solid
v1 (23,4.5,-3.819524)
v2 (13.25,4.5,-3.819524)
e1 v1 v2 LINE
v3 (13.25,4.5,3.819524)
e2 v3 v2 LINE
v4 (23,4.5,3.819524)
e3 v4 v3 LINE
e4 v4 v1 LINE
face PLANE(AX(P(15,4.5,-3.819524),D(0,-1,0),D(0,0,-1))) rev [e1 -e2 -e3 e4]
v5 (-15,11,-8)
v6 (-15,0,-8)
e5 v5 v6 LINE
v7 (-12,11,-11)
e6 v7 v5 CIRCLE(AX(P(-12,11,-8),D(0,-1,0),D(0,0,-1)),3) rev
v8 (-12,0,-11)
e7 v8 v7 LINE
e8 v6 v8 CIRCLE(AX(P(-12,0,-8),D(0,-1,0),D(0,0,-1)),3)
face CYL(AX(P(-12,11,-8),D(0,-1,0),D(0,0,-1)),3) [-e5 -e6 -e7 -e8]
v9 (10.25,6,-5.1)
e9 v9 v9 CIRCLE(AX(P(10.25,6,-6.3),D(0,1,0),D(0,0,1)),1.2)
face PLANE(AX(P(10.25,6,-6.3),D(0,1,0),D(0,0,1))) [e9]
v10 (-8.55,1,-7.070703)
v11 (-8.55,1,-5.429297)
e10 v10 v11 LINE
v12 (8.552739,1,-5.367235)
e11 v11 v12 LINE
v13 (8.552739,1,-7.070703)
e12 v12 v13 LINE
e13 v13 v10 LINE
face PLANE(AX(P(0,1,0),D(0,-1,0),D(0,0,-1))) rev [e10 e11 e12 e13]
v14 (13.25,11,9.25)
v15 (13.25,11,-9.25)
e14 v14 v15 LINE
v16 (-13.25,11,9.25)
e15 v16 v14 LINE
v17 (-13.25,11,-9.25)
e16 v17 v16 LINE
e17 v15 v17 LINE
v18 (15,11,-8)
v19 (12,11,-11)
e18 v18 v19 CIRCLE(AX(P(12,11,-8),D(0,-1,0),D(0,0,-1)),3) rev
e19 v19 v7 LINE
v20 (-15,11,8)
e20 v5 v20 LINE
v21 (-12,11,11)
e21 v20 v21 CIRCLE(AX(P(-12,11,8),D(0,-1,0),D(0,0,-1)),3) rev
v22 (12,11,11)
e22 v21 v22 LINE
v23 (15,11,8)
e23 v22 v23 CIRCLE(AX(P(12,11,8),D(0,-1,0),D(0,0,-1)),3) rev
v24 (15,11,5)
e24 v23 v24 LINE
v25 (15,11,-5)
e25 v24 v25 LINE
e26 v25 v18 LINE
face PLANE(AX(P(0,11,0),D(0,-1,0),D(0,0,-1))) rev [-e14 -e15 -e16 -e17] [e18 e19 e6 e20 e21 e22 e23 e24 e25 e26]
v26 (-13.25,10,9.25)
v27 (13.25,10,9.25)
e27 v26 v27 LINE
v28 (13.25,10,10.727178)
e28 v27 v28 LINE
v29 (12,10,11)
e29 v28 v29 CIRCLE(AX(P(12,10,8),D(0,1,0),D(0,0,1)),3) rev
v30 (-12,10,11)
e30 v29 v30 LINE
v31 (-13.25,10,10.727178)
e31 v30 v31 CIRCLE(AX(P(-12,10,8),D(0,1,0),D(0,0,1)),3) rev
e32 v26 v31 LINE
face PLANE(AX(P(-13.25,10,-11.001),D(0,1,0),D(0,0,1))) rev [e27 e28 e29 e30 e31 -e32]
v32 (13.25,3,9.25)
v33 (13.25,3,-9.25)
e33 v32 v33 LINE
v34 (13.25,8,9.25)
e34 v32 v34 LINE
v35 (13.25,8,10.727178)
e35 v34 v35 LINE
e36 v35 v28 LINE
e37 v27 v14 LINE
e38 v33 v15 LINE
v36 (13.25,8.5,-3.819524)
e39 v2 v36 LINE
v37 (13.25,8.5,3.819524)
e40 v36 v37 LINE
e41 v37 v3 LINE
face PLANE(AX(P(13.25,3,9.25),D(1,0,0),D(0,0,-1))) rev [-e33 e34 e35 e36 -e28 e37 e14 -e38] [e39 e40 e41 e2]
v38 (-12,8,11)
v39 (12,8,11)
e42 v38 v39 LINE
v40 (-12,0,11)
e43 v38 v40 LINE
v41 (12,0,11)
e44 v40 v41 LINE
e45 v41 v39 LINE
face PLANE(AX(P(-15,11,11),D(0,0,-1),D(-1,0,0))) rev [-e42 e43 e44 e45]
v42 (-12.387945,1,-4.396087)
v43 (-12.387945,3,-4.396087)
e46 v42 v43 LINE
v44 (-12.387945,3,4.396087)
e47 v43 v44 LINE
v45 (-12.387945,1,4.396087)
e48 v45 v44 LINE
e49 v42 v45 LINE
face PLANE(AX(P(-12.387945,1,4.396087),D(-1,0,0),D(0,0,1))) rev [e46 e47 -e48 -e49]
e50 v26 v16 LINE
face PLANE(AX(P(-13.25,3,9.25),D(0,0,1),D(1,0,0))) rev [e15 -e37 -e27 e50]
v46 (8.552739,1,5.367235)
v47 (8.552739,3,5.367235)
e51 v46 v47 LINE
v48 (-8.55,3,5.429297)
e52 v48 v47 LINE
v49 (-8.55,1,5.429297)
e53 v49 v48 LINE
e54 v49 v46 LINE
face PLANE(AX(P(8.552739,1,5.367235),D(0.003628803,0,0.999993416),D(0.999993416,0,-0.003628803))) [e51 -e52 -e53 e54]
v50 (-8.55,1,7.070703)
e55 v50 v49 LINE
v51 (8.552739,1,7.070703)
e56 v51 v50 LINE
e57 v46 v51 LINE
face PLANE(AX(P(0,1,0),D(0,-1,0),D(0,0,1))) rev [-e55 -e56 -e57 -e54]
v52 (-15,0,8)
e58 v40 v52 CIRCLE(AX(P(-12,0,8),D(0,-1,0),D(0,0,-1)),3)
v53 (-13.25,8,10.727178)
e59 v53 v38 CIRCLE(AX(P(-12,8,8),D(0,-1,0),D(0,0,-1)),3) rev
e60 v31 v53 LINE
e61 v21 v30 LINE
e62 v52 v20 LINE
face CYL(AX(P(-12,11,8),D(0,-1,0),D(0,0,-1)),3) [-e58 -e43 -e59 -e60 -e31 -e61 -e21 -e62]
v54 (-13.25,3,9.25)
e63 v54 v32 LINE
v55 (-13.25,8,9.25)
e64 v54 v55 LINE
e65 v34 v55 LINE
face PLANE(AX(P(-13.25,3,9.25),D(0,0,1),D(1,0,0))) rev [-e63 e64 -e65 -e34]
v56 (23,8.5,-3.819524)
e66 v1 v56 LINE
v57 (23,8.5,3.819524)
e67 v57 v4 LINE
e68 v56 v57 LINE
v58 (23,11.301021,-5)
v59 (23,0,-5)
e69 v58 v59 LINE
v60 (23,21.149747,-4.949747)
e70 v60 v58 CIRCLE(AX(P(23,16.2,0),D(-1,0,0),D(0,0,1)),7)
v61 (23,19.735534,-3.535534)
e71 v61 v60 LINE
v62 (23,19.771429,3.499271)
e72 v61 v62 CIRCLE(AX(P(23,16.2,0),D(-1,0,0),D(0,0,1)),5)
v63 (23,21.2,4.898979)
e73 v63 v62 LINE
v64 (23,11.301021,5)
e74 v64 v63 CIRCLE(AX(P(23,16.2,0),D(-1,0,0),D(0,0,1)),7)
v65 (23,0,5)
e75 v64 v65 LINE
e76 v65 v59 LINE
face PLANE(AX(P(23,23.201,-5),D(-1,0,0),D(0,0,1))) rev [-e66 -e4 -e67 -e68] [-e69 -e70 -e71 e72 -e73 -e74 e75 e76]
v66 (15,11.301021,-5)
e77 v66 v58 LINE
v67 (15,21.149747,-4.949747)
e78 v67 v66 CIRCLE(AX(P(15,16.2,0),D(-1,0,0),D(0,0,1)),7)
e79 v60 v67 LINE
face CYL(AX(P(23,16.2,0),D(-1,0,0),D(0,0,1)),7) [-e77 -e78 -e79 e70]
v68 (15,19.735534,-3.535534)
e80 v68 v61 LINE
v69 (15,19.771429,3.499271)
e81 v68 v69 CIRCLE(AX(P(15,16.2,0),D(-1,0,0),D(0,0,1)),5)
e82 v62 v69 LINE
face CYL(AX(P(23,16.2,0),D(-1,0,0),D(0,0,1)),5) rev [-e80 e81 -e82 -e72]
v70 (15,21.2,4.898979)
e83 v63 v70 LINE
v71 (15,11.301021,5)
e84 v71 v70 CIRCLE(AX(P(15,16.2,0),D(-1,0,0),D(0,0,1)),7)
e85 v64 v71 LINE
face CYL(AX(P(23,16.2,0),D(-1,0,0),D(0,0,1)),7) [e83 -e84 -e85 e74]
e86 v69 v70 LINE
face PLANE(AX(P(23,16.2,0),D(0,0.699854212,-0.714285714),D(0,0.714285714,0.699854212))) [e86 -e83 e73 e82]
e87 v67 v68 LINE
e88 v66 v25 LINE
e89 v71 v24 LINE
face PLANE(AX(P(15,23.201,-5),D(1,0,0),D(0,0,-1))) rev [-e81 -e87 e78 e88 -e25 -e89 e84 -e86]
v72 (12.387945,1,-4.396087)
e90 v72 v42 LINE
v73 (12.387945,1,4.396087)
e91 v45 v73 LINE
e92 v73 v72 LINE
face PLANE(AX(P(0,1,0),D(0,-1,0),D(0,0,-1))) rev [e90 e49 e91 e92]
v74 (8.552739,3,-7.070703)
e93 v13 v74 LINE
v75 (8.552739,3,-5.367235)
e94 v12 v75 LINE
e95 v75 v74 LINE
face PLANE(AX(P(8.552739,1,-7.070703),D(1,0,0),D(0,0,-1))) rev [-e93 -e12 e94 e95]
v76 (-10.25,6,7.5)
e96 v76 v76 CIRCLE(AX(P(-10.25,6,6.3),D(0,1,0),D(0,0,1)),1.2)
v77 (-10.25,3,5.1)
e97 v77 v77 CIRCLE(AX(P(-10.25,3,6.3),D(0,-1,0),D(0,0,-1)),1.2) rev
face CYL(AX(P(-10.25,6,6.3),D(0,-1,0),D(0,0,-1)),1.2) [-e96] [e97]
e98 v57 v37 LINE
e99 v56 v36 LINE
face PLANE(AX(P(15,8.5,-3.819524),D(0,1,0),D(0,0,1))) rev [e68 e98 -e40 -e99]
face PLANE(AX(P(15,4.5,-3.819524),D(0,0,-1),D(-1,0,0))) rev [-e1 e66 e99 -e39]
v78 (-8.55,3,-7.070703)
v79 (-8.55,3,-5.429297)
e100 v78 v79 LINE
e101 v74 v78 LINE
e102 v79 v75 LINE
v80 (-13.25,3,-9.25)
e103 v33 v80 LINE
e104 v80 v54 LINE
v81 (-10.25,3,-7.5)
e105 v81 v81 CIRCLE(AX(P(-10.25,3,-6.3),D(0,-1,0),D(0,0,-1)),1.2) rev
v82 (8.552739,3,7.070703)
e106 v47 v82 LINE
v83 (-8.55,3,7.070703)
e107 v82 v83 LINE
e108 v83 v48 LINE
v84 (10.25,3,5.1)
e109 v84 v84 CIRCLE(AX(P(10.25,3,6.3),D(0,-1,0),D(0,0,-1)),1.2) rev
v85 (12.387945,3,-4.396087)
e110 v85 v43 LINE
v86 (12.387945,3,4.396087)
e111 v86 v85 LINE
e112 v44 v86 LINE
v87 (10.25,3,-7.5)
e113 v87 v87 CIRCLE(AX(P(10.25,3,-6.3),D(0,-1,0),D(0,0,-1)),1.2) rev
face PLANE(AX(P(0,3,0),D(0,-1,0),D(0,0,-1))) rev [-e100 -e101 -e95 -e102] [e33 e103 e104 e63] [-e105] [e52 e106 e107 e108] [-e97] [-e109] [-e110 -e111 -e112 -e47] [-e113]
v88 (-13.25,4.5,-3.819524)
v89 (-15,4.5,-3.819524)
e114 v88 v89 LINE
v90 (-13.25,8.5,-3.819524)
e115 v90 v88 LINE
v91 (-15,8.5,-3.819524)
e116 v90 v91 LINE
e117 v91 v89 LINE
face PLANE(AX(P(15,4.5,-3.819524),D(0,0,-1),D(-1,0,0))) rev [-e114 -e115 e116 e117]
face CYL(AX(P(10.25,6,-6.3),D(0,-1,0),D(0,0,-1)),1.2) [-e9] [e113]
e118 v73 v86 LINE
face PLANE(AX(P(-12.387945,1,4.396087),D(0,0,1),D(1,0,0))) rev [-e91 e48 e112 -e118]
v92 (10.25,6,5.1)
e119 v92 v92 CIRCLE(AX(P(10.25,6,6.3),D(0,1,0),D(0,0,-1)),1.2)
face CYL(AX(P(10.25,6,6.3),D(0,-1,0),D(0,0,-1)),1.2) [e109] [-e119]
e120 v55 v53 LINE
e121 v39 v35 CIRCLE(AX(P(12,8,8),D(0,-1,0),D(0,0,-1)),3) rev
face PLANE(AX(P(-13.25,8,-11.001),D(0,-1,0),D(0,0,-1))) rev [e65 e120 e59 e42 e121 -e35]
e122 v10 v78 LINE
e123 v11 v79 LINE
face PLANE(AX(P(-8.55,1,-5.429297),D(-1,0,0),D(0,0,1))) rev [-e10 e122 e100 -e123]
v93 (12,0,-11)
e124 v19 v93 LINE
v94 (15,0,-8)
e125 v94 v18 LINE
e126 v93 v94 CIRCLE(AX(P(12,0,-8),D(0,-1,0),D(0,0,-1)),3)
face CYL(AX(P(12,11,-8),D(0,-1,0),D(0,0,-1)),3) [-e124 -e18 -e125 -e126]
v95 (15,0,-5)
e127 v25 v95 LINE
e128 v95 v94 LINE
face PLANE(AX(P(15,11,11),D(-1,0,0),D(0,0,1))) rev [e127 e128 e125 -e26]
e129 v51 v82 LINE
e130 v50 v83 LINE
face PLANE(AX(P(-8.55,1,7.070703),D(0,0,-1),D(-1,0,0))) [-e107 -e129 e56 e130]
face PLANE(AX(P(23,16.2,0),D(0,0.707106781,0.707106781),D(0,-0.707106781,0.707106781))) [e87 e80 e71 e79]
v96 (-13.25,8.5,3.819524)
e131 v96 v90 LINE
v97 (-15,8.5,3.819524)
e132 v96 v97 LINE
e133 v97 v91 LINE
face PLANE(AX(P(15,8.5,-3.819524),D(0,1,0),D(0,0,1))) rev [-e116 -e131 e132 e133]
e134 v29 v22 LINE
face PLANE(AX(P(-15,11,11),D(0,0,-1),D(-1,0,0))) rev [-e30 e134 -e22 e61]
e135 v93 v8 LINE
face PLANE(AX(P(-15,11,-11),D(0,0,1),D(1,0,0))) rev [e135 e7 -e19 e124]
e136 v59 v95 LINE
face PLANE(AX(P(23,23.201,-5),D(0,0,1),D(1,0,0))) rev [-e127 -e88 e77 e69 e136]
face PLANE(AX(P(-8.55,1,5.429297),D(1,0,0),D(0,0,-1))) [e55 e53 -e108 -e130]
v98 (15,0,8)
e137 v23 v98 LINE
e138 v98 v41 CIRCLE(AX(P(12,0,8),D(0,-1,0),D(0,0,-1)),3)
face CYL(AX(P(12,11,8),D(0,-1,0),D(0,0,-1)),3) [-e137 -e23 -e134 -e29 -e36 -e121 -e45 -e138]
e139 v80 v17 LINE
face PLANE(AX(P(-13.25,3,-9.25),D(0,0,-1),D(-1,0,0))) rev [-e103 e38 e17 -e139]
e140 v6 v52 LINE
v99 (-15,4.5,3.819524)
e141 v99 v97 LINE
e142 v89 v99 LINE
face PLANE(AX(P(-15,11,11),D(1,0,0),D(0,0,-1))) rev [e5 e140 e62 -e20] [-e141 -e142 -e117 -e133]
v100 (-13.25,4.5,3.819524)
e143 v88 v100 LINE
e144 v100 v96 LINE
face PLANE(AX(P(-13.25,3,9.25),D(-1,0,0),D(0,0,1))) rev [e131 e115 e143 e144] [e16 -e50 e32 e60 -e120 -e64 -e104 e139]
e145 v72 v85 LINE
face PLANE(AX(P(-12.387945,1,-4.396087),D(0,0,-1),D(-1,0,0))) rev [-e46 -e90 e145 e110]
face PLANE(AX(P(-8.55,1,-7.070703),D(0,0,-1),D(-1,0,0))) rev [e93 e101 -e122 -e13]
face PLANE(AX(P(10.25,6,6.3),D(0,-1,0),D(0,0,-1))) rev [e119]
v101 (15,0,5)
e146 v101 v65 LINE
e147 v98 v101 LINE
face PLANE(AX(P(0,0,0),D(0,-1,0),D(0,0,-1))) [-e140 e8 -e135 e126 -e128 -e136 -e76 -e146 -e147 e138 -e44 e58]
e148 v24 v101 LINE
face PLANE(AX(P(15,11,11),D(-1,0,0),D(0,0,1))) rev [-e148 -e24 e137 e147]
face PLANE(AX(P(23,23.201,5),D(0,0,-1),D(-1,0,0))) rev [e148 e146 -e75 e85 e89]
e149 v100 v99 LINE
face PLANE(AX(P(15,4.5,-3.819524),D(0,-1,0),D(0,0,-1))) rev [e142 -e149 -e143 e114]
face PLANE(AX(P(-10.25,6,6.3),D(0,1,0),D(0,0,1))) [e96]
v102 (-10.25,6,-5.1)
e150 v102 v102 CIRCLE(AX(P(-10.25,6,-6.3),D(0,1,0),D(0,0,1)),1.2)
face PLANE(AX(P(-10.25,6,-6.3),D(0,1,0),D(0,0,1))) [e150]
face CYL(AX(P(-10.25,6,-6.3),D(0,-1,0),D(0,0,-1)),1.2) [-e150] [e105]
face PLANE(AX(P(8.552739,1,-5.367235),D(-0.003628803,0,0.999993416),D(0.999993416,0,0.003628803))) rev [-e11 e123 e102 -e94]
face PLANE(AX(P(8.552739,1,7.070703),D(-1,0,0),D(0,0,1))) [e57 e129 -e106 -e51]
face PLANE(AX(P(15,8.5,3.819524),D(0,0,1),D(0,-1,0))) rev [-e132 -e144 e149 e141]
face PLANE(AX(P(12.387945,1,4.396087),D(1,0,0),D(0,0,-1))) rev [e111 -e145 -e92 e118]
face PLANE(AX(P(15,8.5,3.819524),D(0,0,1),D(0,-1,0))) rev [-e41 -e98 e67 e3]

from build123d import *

# Parameters (mm, degrees)
SKETCH1_W                = 30
SKETCH1_H                = 22
BOSS_EXTRUDE1_DEPTH      = 11
SKETCH2_W                = 26.5
SKETCH2_H                = 18.5
CUT_EXTRUDE1_DEPTH       = 8
SKETCH3_R                = 1.2
BOSS_EXTRUDE2_DEPTH      = 3
CUT_EXTRUDE2_DEPTH       = 2
SKETCH5_W                = 7.639048366
SKETCH5_H                = 4
CUT_EXTRUDE3_DEPTH       = 34.793490497
CUT_EXTRUDE4_REACH       = 30.81
SKETCH6_W                = 26.5
SKETCH6_H                = 2
SKETCH8_W                = 24.775890618
SKETCH8_H                = 8.79217469
CUT_EXTRUDE5_DEPTH       = 2
FILLET1_R                = 3
SKETCH10_R               = 7
SKETCH10_R_2             = 5
BOSS_EXTRUDE4_DEPTH      = 8
BOSS_EXTRUDE8_REACH      = 36.471
BOSS_EXTRUDE8_END_RADIUS = 7
SKETCH15_W               = 8
SKETCH15_H               = 10
SKETCH16_W               = 7.639048366
SKETCH16_H               = 4
CUT_EXTRUDE7_DEPTH       = 46.861094623
CUT_EXTRUDE8_REACH       = 47.861


with BuildPart() as part:
    # Sketch1 → Boss-Extrude1 (new body)
    with BuildSketch(Plane(origin=(0, 0, 0), x_dir=(1, 0, 0), z_dir=(0, 1, 0))):
        Rectangle(SKETCH1_W, SKETCH1_H)
    extrude(amount=BOSS_EXTRUDE1_DEPTH)

    # Sketch2 → Cut-Extrude1 (cut)
    with BuildSketch(Plane(origin=(0, 11, 0), x_dir=(1, 0, 0), z_dir=(0, 1, 0))):
        Rectangle(SKETCH2_W, SKETCH2_H)
    extrude(amount=-CUT_EXTRUDE1_DEPTH, mode=Mode.SUBTRACT)

    # Sketch3 → Boss-Extrude2 (add)
    with BuildSketch(Plane(origin=(0, 3, 0), x_dir=(1, 0, 0), z_dir=(0, 1, 0))):
        with Locations(Location((-10.25, -6.3, 0), (0, 0, 90))):
            Circle(SKETCH3_R)
        with Locations(Location((10.25, -6.3, 0), (0, 0, 90))):
            Circle(SKETCH3_R)
        with Locations(Location((10.25, 6.3, 0), (0, 0, 90))):
            Circle(SKETCH3_R)
        with Locations(Location((-10.25, 6.3, 0), (0, 0, 90))):
            Circle(SKETCH3_R)
    extrude(amount=BOSS_EXTRUDE2_DEPTH)

    # Sketch4 → Cut-Extrude2 (cut)
    with BuildSketch(Plane(origin=(0, 3, 0), x_dir=(1, 0, 0), z_dir=(0, 1, 0))):
        Polygon((8.552738998, 7.070702511), (8.552738998, 5.36723461), (-8.55, 5.429297489), (-8.55, 7.070702511), align=None)
    cut_extrude2 = extrude(amount=-CUT_EXTRUDE2_DEPTH, mode=Mode.SUBTRACT)

    # Mirror1: Cut-Extrude2 across plane
    add(cut_extrude2.mirror(Plane.XY), mode=Mode.SUBTRACT)

    # Sketch5 → Cut-Extrude3 (cut, through all)
    with BuildSketch(Plane.ZY.offset(15)):
        with Locations((0, 6.5)):
            Rectangle(SKETCH5_W, SKETCH5_H)
    extrude(amount=-CUT_EXTRUDE3_DEPTH, mode=Mode.SUBTRACT)

    # Sketch6 → Cut-Extrude4 (cut, up to next)
    with BuildSketch(Plane.XY.offset(11), mode=Mode.PRIVATE) as cut_extrude4_sk1:
        with Locations((0, 9)):
            Rectangle(SKETCH6_W, SKETCH6_H)
    cut_extrude4_tool1 = extrude(cut_extrude4_sk1.sketch, amount=-CUT_EXTRUDE4_REACH, mode=Mode.PRIVATE) & part.part
    add(cut_extrude4_tool1.solids().sort_by_distance((0, 9, 11))[0], mode=Mode.SUBTRACT)

    # Sketch8 → Cut-Extrude5 (cut)
    with BuildSketch(Plane(origin=(0, 3, 0), x_dir=(1, 0, 0), z_dir=(0, 1, 0))):
        Rectangle(SKETCH8_W, SKETCH8_H)
    extrude(amount=-CUT_EXTRUDE5_DEPTH, mode=Mode.SUBTRACT)

    # Fillet1
    # the kernel refuses this fillet: 3 mm, written as the material it takes off along each edge
    with BuildSketch(Plane(origin=(-15, -7.5, 11), x_dir=(1, 0, 0), z_dir=(0, 1, 0)), Plane(origin=(-15, -7.5, -11), x_dir=(0, 0, 1), z_dir=(0, 1, 0))) as fillet1_piece_1:
        with BuildLine():
            CenterArc((FILLET1_R, FILLET1_R), FILLET1_R, 180, 90)
            Line((0, FILLET1_R), (0, 0))
            Line((0, 0), (FILLET1_R, 0))
        make_face()
    extrude(amount=26, mode=Mode.SUBTRACT)
    with BuildSketch(Plane(origin=(15, -7.5, 11), x_dir=(-1, 0, 0), z_dir=(0, 1, 0)), Plane(origin=(15, -7.5, -11), x_dir=(0, 0, 1), z_dir=(0, 1, 0))) as fillet1_piece_2:
        with BuildLine():
            CenterArc((FILLET1_R, -FILLET1_R), FILLET1_R, 90, 90)
            Line((0, -FILLET1_R), (0, 0))
            Line((0, 0), (FILLET1_R, 0))
        make_face()
    extrude(amount=26, mode=Mode.SUBTRACT)



with BuildPart() as body_2:
    # Sketch10 → Boss-Extrude4 (new body)
    with BuildSketch(Plane(origin=(15, 0, -26), x_dir=(0, 0, 1), z_dir=(-1, 0, 0))):
        with Locations((26, 16.2)):
            Circle(SKETCH10_R)
        with Locations((26, 16.2)):
            Circle(SKETCH10_R_2, mode=Mode.SUBTRACT)
    extrude(amount=-BOSS_EXTRUDE4_DEPTH)


with BuildPart() as part_1:
    add(part.part)

    add(body_2.part)  # Boss-Extrude8 merges body 2
    # Boss-Extrude8: up to this cylinder (the profile starts outside it)
    boss_extrude8_end = Plane(origin=(19, 16.2, 0), z_dir=(-1, 0, 0)) * Cylinder(BOSS_EXTRUDE8_END_RADIUS, 87.942, mode=Mode.PRIVATE)
    # Sketch15 → Boss-Extrude8 (add, up to the surface)
    with BuildSketch(Plane(origin=(0, 0, 0), x_dir=(1, 0, 0), z_dir=(0, 1, 0)), mode=Mode.PRIVATE) as boss_extrude8_sk1:
        with Locations((19, 0)):
            Rectangle(SKETCH15_W, SKETCH15_H)
    boss_extrude8_tool1 = extrude(boss_extrude8_sk1.sketch, amount=BOSS_EXTRUDE8_REACH, mode=Mode.PRIVATE) - boss_extrude8_end
    add(boss_extrude8_tool1.solids().sort_by_distance((19, 0, 0))[0])

    # Sketch16 → Cut-Extrude7 (cut, through all)
    with BuildSketch(Plane(origin=(23, 0, 0), x_dir=(0, 0, -1), z_dir=(1, 0, 0))):
        with Locations((0, 6.5)):
            Rectangle(SKETCH16_W, SKETCH16_H)
    extrude(amount=-CUT_EXTRUDE7_DEPTH, mode=Mode.SUBTRACT)

    # Sketch17 → Cut-Extrude8 (cut, up to next)
    with BuildSketch(Plane(origin=(23, 0, 0), x_dir=(0, 0, -1), z_dir=(1, 0, 0)), mode=Mode.PRIVATE) as cut_extrude8_sk1:
        with BuildLine():
            Line((-4.898979486, 21.2), (-3.499271061, 19.771428571))
            ThreePointArc((-3.499271061, 19.771428571), (0.025511865, 21.199934914), (3.535533906, 19.735533906))
            Line((3.535533906, 19.735533906), (4.949747468, 21.149747468))
            ThreePointArc((4.949747468, 21.149747468), (0.03571661, 23.19990888), (-4.898979486, 21.2))
        make_face()
    cut_extrude8_tool1 = extrude(cut_extrude8_sk1.sketch, amount=-CUT_EXTRUDE8_REACH, mode=Mode.PRIVATE) & part_1.part
    add(cut_extrude8_tool1.solids().sort_by_distance((23, 21.659424, -0.027856))[0], mode=Mode.SUBTRACT)


solid = part_1.part
